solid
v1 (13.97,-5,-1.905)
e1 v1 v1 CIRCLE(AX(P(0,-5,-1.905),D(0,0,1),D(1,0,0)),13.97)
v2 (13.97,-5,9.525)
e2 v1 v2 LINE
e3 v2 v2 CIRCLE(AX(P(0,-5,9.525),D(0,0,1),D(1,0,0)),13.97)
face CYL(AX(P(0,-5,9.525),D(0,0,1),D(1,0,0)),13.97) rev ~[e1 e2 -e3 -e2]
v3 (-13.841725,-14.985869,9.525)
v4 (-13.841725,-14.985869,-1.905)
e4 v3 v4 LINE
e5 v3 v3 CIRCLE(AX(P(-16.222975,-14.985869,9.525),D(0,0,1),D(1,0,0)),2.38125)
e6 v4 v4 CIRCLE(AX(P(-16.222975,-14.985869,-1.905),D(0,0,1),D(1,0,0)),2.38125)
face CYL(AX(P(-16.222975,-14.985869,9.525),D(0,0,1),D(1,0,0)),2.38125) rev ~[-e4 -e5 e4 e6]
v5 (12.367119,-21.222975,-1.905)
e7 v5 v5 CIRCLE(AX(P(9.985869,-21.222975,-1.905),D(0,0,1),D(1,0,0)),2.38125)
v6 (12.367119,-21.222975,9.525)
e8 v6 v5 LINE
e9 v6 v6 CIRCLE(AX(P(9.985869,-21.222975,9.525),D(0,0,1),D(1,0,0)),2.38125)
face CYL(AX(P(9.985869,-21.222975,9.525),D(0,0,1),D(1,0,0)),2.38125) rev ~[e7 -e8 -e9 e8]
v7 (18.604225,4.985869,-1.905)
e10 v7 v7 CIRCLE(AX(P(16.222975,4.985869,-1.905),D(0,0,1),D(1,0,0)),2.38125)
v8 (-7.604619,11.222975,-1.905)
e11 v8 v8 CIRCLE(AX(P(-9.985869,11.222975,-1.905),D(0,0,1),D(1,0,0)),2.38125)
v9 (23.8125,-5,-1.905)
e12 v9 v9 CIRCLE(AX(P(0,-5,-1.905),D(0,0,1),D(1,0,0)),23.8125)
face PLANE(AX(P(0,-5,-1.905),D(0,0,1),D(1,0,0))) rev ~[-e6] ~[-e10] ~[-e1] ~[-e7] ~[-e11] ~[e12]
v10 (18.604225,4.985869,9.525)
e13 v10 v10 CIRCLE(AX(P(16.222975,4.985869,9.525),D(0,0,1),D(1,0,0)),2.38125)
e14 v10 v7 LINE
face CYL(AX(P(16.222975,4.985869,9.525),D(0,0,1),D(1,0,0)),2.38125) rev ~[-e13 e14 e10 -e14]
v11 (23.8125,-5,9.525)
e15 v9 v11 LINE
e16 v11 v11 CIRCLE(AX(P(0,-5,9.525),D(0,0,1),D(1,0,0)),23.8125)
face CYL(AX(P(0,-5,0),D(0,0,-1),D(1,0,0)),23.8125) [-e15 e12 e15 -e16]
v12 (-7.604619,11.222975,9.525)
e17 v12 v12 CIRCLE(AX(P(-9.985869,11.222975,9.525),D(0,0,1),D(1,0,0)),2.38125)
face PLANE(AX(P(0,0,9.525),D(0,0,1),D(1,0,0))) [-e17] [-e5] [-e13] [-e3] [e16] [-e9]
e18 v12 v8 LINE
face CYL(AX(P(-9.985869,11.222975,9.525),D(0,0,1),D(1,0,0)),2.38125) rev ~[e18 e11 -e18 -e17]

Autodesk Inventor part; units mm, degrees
ref_plane "YZ Plane" through (0, 0, 0) normal (1, 0, 0) x (0, 1, 0)
ref_plane "XZ Plane" through (0, 0, 0) normal (0, 1, 0) x (-1, 0, 0)
ref_plane "XY Plane" through (0, 0, 0) normal (0, 0, 1) x (1, 0, 0)
sketch "Sketch1" plane through (0, 0, 0) normal (0, 0, 1) x (1, 0, 0)
  circle A0 centre (0, -5) radius 23.8125
  ellipse E0 centre (-25.066556, -29.009567) end of major axis (-17.396721, -26.490299) minor radius 5.878917 (-26.90757, -23.426346) -> (-26.90757, -23.426346) ccw
  line L0 (-26.90757, -23.426346) -> (-27.832023, -23.737709)
  line L1 (-29.265886, -21.408265) -> (-28.524708, -20.677009)
  ellipse E1 centre (-32.727164, -16.564341) end of major axis (-27.02296, -10.851314) minor radius 5.879236 (-28.571485, -20.72316) -> (-28.525164, -20.676548) ccw
  ellipse E2 centre (-32.346551, -17.58951) end of major axis (-24.296384, -18.197133) minor radius 5.879035 (-31.91081, -11.726643) -> (-31.91081, -11.726643) ccw
  line L2 (-31.91081, -11.726643) -> (-32.884047, -11.660532)
  line L3 (-33.317324, -8.95969) -> (-32.352726, -8.567735)
  ellipse E3 centre (-34.661269, -3.160316) end of major axis (-27.205269, -0.065183) minor radius 5.878801 (-32.413603, -8.592472) -> (-32.35297, -8.567134) ccw
  ellipse E4 centre (-34.70212, -4.252716) end of major axis (-41.906987, -0.610674) minor radius 5.879052 (-32.055919, 0.997131) -> (-32.055919, 0.997131) ccw
  line L4 (-32.055919, 0.997131) -> (-32.929773, 1.430651)
  line L5 (-32.296502, 4.091711) -> (-31.255334, 4.084695)
  ellipse E5 centre (-31.318819, 9.963759) end of major axis (-23.246042, 9.970002) minor radius 5.878619 (-31.321044, 4.085138) -> (-31.25533, 4.085343) ccw
  ellipse E6 centre (-31.774878, 8.970095) end of major axis (-37.03772, 15.092271) minor radius 5.879409 (-27.320805, 12.807895) -> (-27.320805, 12.807895) ccw
  line L6 (-27.320805, 12.807895) -> (-27.96224, 13.542826)
  line L7 (-26.35883, 15.758982) -> (-25.399601, 15.354063)
  ellipse E7 centre (-23.208166, 20.81056) end of major axis (-30.669277, 23.894301) minor radius 5.879328 (-25.46014, 15.379618) -> (-25.399349, 15.35466) ccw
  ellipse E8 centre (-24.009591, 20.066548) end of major axis (-26.528865, 27.736399) minor radius 5.878942 (-18.426346, 21.90757) -> (-18.426346, 21.90757) ccw
  line L8 (-18.426346, 21.90757) -> (-18.737709, 22.832023)
  line L9 (-16.408265, 24.265886) -> (-15.677009, 23.524708)
  ellipse E9 centre (-11.564623, 27.726877) end of major axis (-17.277457, 33.430884) minor radius 5.878834 (-15.72316, 23.571485) -> (-15.676548, 23.525164) ccw
  ellipse E10 centre (-12.589421, 27.346544) end of major axis (-11.981802, 35.39665) minor radius 5.878946 (-6.726643, 26.91081) -> (-6.726643, 26.91081) ccw
  line L10 (-6.726643, 26.91081) -> (-6.660532, 27.884047)
  line L11 (-3.95969, 28.317324) -> (-3.567735, 27.352726)
  ellipse E11 centre (1.839847, 29.661337) end of major axis (-1.255331, 37.11745) minor radius 5.878977 (-3.592472, 27.413603) -> (-3.567134, 27.35297) ccw
  ellipse E12 centre (0.747946, 29.701782) end of major axis (4.389762, 36.906192) minor radius 5.878309 (5.997131, 27.055919) -> (5.997131, 27.055919) ccw
  line L12 (5.997131, 27.055919) -> (6.430651, 27.929773)
  line L13 (9.091711, 27.296502) -> (9.084695, 26.255334)
  ellipse E13 centre (14.963894, 26.318821) end of major axis (14.957652, 34.391691) minor radius 5.878755 (9.085138, 26.321044) -> (9.085343, 26.25533) ccw
  ellipse E14 centre (13.970251, 26.774696) end of major axis (20.092302, 32.03743) minor radius 5.87917 (17.807895, 22.320805) -> (17.807895, 22.320805) ccw
  line L14 (17.807895, 22.320805) -> (18.542826, 22.96224)
  line L15 (20.758982, 21.35883) -> (20.354063, 20.399601)
  ellipse E15 centre (25.810277, 18.208281) end of major axis (28.893936, 25.669199) minor radius 5.879023 (20.379618, 20.46014) -> (20.35466, 20.399349) ccw
  ellipse E16 centre (25.066434, 19.009945) end of major axis (32.736527, 21.529301) minor radius 5.879314 (26.90757, 13.426346) -> (26.90757, 13.426346) ccw
  line L16 (26.90757, 13.426346) -> (27.832023, 13.737709)
  line L17 (29.265886, 11.408265) -> (28.524708, 10.677009)
  ellipse E17 centre (32.727281, 6.564224) end of major axis (38.431566, 12.277331) minor radius 5.879402 (28.571485, 10.72316) -> (28.525164, 10.676548) ccw
  ellipse E18 centre (32.346566, 7.5897) end of major axis (40.396864, 6.982068) minor radius 5.879226 (31.91081, 1.726643) -> (31.91081, 1.726643) ccw
  line L18 (31.91081, 1.726643) -> (32.884047, 1.660532)
  line L19 (33.317324, -1.04031) -> (32.352726, -1.432265)
  ellipse E19 centre (34.661448, -6.840109) end of major axis (42.117742, -3.744858) minor radius 5.879261 (32.413603, -1.407528) -> (32.35297, -1.432866) ccw
  ellipse E20 centre (34.701968, -5.747582) end of major axis (27.497307, -2.105643) minor radius 5.878717 (32.055919, -10.997131) -> (32.055919, -10.997131) ccw
  line L20 (32.055919, -10.997131) -> (32.929773, -11.430651)
  line L21 (32.296502, -14.091711) -> (31.255334, -14.084695)
  ellipse E21 centre (31.318824, -19.964675) end of major axis (39.392231, -19.958437) minor radius 5.879535 (31.321044, -14.085138) -> (31.25533, -14.085343) ccw
  ellipse E22 centre (31.774631, -18.970306) end of major axis (26.511936, -12.848298) minor radius 5.879085 (27.320805, -22.807895) -> (27.320805, -22.807895) ccw
  line L22 (27.320805, -22.807895) -> (27.96224, -23.542826)
  line L23 (26.35883, -25.758982) -> (25.399601, -25.354063)
  ellipse E23 centre (23.208233, -30.810396) end of major axis (15.747234, -27.726703) minor radius 5.879151 (25.46014, -25.379618) -> (25.399349, -25.35466) ccw
  ellipse E24 centre (24.00979, -30.066484) end of major axis (21.49047, -22.396496) minor radius 5.879152 (18.426346, -31.90757) -> (18.426346, -31.90757) ccw
  line L24 (18.426346, -31.90757) -> (18.737709, -32.832023)
  line L25 (16.408265, -34.265886) -> (15.677009, -33.524708)
  ellipse E25 centre (11.564423, -37.72708) end of major axis (5.851452, -32.022934) minor radius 5.879119 (15.72316, -33.571485) -> (15.676548, -33.525164) ccw
  ellipse E26 centre (12.58943, -37.346545) end of major axis (13.19705, -29.296433) minor radius 5.878955 (6.726643, -36.91081) -> (6.726643, -36.91081) ccw
  line L26 (6.726643, -36.91081) -> (6.660532, -37.884047)
  line L27 (3.95969, -38.317324) -> (3.567735, -37.352726)
  ellipse E27 centre (-1.840043, -39.66142) end of major axis (-4.935276, -32.205172) minor radius 5.87919 (3.592472, -37.413603) -> (3.567134, -37.35297) ccw
  ellipse E28 centre (-0.747551, -39.701984) end of major axis (2.8944, -32.497302) minor radius 5.878752 (-5.997131, -37.055919) -> (-5.997131, -37.055919) ccw
  line L28 (-5.997131, -37.055919) -> (-6.430651, -37.929773)
  line L29 (-9.091711, -37.296502) -> (-9.084695, -36.255334)
  ellipse E29 centre (-14.964581, -36.318823) end of major axis (-14.970819, -28.245481) minor radius 5.879441 (-9.085138, -36.321044) -> (-9.085343, -36.25533) ccw
  ellipse E30 centre (-13.970405, -36.774515) end of major axis (-7.848476, -31.511889) minor radius 5.878932 (-17.807895, -32.320805) -> (-17.807895, -32.320805) ccw
  line L30 (-17.807895, -32.320805) -> (-18.542826, -32.96224)
  line L31 (-20.758982, -31.35883) -> (-20.354063, -30.399601)
  ellipse E31 centre (-25.810473, -28.208202) end of major axis (-22.726757, -20.74715) minor radius 5.879234 (-20.379618, -30.46014) -> (-20.35466, -30.399349) ccw
  arc A1 (-20.35466, -30.399349) -> (-19.644418, -27.762867) centre (-30.622228, -26.219462) ccw
  arc A2 (-19.644418, -27.762867) -> (-24.163023, -22.894122) centre (-23.857511, -27.141776) ccw
  arc A3 (-24.163023, -22.894122) -> (-26.845089, -23.405986) centre (-23.441695, -33.956404) ccw
  arc A4 (-28.525164, -20.676548) -> (-26.860048, -18.512554) centre (-36.411586, -12.885608) ccw
  arc A5 (-26.860048, -18.512554) -> (-29.171506, -12.285224) centre (-30.514757, -16.32646) ccw
  arc A6 (-29.171506, -12.285224) -> (-31.845294, -11.731743) centre (-32.738439, -22.781481) ccw
  arc A7 (-32.35297, -8.567134) -> (-29.986479, -7.205076) centre (-36.657611, 1.648759) ccw
  arc A8 (-29.986479, -7.205076) -> (-29.738892, -0.567217) centre (-32.526408, -3.786792) ccw
  arc A9 (-29.738892, -0.567217) -> (-31.997342, 0.967347) centre (-37.051052, -8.899488) ccw
  arc A10 (-31.25533, 4.085343) -> (-28.54774, 4.438104) centre (-31.322846, 15.170913) ccw
  arc A11 (-28.54774, 4.438104) -> (-25.778801, 10.475939) centre (-29.586208, 8.568175) ccw
  arc A12 (-25.778801, 10.475939) -> (-27.278084, 12.757962) centre (-35.722978, 5.576167) ccw
  arc A13 (-25.399349, 15.35466) -> (-22.762867, 14.644418) centre (-21.219462, 25.622228) ccw
  arc A14 (-22.762867, 14.644418) -> (-17.894122, 19.163023) centre (-22.141776, 18.857511) ccw
  arc A15 (-17.894122, 19.163023) -> (-18.405986, 21.845089) centre (-28.956404, 18.441695) ccw
  arc A16 (-15.676548, 23.525164) -> (-13.512554, 21.860048) centre (-7.885608, 31.411586) ccw
  arc A17 (-13.512554, 21.860048) -> (-7.285224, 24.171506) centre (-11.32646, 25.514757) ccw
  arc A18 (-7.285224, 24.171506) -> (-6.731743, 26.845294) centre (-17.781481, 27.738439) ccw
  arc A19 (-3.567134, 27.35297) -> (-2.205076, 24.986479) centre (6.648759, 31.657611) ccw
  arc A20 (-2.205076, 24.986479) -> (4.432783, 24.738892) centre (1.213208, 27.526408) ccw
  arc A21 (4.432783, 24.738892) -> (5.967347, 26.997342) centre (-3.899488, 32.051052) ccw
  arc A22 (9.085343, 26.25533) -> (9.438104, 23.54774) centre (20.170913, 26.322846) ccw
  arc A23 (9.438104, 23.54774) -> (15.475939, 20.778801) centre (13.568175, 24.586208) ccw
  arc A24 (15.475939, 20.778801) -> (17.757962, 22.278084) centre (10.576167, 30.722978) ccw
  arc A25 (20.35466, 20.399349) -> (19.644418, 17.762867) centre (30.622228, 16.219462) ccw
  arc A26 (19.644418, 17.762867) -> (24.163023, 12.894122) centre (23.857511, 17.141776) ccw
  arc A27 (24.163023, 12.894122) -> (26.845089, 13.405986) centre (23.441695, 23.956404) ccw
  arc A28 (28.525164, 10.676548) -> (26.860048, 8.512554) centre (36.411586, 2.885608) ccw
  arc A29 (26.860048, 8.512554) -> (29.171506, 2.285224) centre (30.514757, 6.32646) ccw
  arc A30 (29.171506, 2.285224) -> (31.845294, 1.731743) centre (32.738439, 12.781481) ccw
  arc A31 (32.35297, -1.432866) -> (29.986479, -2.794924) centre (36.657611, -11.648759) ccw
  arc A32 (29.986479, -2.794924) -> (29.738892, -9.432783) centre (32.526408, -6.213208) ccw
  arc A33 (29.738892, -9.432783) -> (31.997342, -10.967347) centre (37.051052, -1.100512) ccw
  arc A34 (31.25533, -14.085343) -> (28.54774, -14.438104) centre (31.322846, -25.170913) ccw
  arc A35 (28.54774, -14.438104) -> (25.778801, -20.475939) centre (29.586208, -18.568175) ccw
  arc A36 (25.778801, -20.475939) -> (27.278084, -22.757962) centre (35.722978, -15.576167) ccw
  arc A37 (25.399349, -25.35466) -> (22.762867, -24.644418) centre (21.219462, -35.622228) ccw
  arc A38 (22.762867, -24.644418) -> (17.894122, -29.163023) centre (22.141776, -28.857511) ccw
  arc A39 (17.894122, -29.163023) -> (18.405986, -31.845089) centre (28.956404, -28.441695) ccw
  arc A40 (15.676548, -33.525164) -> (13.512554, -31.860048) centre (7.885608, -41.411586) ccw
  arc A41 (13.512554, -31.860048) -> (7.285224, -34.171506) centre (11.32646, -35.514757) ccw
  arc A42 (7.285224, -34.171506) -> (6.731743, -36.845294) centre (17.781481, -37.738439) ccw
  arc A43 (3.567134, -37.35297) -> (2.205076, -34.986479) centre (-6.648759, -41.657611) ccw
  arc A44 (2.205076, -34.986479) -> (-4.432783, -34.738892) centre (-1.213208, -37.526408) ccw
  arc A45 (-4.432783, -34.738892) -> (-5.967347, -36.997342) centre (3.899488, -42.051052) ccw
  arc A46 (-9.085343, -36.25533) -> (-9.438104, -33.54774) centre (-20.170913, -36.322846) ccw
  arc A47 (-9.438104, -33.54774) -> (-15.475939, -30.778801) centre (-13.568175, -34.586208) ccw
  arc A48 (-15.475939, -30.778801) -> (-17.757962, -32.278084) centre (-10.576167, -40.722978) ccw
  circle A49 centre (0, -5) radius 13.97
  arc A50 (-30.44477, -24.101609) -> (-27.832023, -23.737709) centre (-30.102742, -16.995817) ccw
  arc A51 (-30.767675, -23.57702) -> (-30.44477, -24.101609) centre (0, -5) ccw
  arc A52 (-29.265886, -21.408265) -> (-30.767675, -23.57702) centre (-24.269527, -26.472419) ccw
  arc A53 (-35.437169, -10.996877) -> (-32.884047, -11.660532) centre (-32.401908, -4.562869) ccw
  arc A54 (-35.534743, -10.388649) -> (-35.437169, -10.996877) centre (0, -5) ccw
  arc A55 (-33.317324, -8.95969) -> (-35.534743, -10.388649) centre (-30.639258, -15.550383) ccw
  arc A56 (-35.034581, 3.020825) -> (-32.929773, 1.430651) centre (-29.768177, 7.803529) ccw
  arc A57 (-34.891968, 3.620095) -> (-35.034581, 3.020825) centre (0, -5) ccw
  arc A58 (-32.296502, 4.091711) -> (-34.891968, 3.620095) centre (-32.34444, -3.022146) ccw
  arc A59 (-29.298295, 15.81743) -> (-27.96224, 13.542826) centre (-22.602511, 18.220707) ccw
  arc A60 (-28.937208, 16.316507) -> (-29.298295, 15.81743) centre (0, -5) ccw
  arc A61 (-26.35883, 15.758982) -> (-28.937208, 16.316507) centre (-29.125474, 9.20498) ccw
  arc A62 (-19.101609, 25.44477) -> (-18.737709, 22.832023) centre (-11.995817, 25.102742) ccw
  arc A63 (-18.57702, 25.767675) -> (-19.101609, 25.44477) centre (0, -5) ccw
  arc A64 (-16.408265, 24.265886) -> (-18.57702, 25.767675) centre (-21.472419, 19.269527) ccw
  arc A65 (-5.996877, 30.437169) -> (-6.660532, 27.884047) centre (0.437131, 27.401908) ccw
  arc A66 (-5.388649, 30.534743) -> (-5.996877, 30.437169) centre (0, -5) ccw
  arc A67 (-3.95969, 28.317324) -> (-5.388649, 30.534743) centre (-10.550383, 25.639258) ccw
  arc A68 (8.020825, 30.034581) -> (6.430651, 27.929773) centre (12.803529, 24.768177) ccw
  arc A69 (8.620095, 29.891968) -> (8.020825, 30.034581) centre (0, -5) ccw
  arc A70 (9.091711, 27.296502) -> (8.620095, 29.891968) centre (1.977854, 27.34444) ccw
  arc A71 (20.81743, 24.298295) -> (18.542826, 22.96224) centre (23.220707, 17.602511) ccw
  arc A72 (21.316507, 23.937208) -> (20.81743, 24.298295) centre (0, -5) ccw
  arc A73 (20.758982, 21.35883) -> (21.316507, 23.937208) centre (14.20498, 24.125474) ccw
  arc A74 (30.44477, 14.101609) -> (27.832023, 13.737709) centre (30.102742, 6.995817) ccw
  arc A75 (30.767675, 13.57702) -> (30.44477, 14.101609) centre (0, -5) ccw
  arc A76 (29.265886, 11.408265) -> (30.767675, 13.57702) centre (24.269527, 16.472419) ccw
  arc A77 (35.437169, 0.996877) -> (32.884047, 1.660532) centre (32.401908, -5.437131) ccw
  arc A78 (35.534743, 0.388649) -> (35.437169, 0.996877) centre (0, -5) ccw
  arc A79 (33.317324, -1.04031) -> (35.534743, 0.388649) centre (30.639258, 5.550383) ccw
  arc A80 (35.034581, -13.020825) -> (32.929773, -11.430651) centre (29.768177, -17.803529) ccw
  arc A81 (34.891968, -13.620095) -> (35.034581, -13.020825) centre (0, -5) ccw
  arc A82 (32.296502, -14.091711) -> (34.891968, -13.620095) centre (32.34444, -6.977854) ccw
  arc A83 (29.298295, -25.81743) -> (27.96224, -23.542826) centre (22.602511, -28.220707) ccw
  arc A84 (28.937208, -26.316507) -> (29.298295, -25.81743) centre (0, -5) ccw
  arc A85 (26.35883, -25.758982) -> (28.937208, -26.316507) centre (29.125474, -19.20498) ccw
  arc A86 (19.101609, -35.44477) -> (18.737709, -32.832023) centre (11.995817, -35.102742) ccw
  arc A87 (18.57702, -35.767675) -> (19.101609, -35.44477) centre (0, -5) ccw
  arc A88 (16.408265, -34.265886) -> (18.57702, -35.767675) centre (21.472419, -29.269527) ccw
  arc A89 (5.996877, -40.437169) -> (6.660532, -37.884047) centre (-0.437131, -37.401908) ccw
  arc A90 (5.388649, -40.534743) -> (5.996877, -40.437169) centre (0, -5) ccw
  arc A91 (3.95969, -38.317324) -> (5.388649, -40.534743) centre (10.550383, -35.639258) ccw
  arc A92 (-8.020825, -40.034581) -> (-6.430651, -37.929773) centre (-12.803529, -34.768177) ccw
  arc A93 (-8.620095, -39.891968) -> (-8.020825, -40.034581) centre (0, -5) ccw
  arc A94 (-9.091711, -37.296502) -> (-8.620095, -39.891968) centre (-1.977854, -37.34444) ccw
  arc A95 (-20.81743, -34.298295) -> (-18.542826, -32.96224) centre (-23.220707, -27.602511) ccw
  arc A96 (-21.316507, -33.937208) -> (-20.81743, -34.298295) centre (0, -5) ccw
  arc A97 (-20.758982, -31.35883) -> (-21.316507, -33.937208) centre (-14.20498, -34.125474) ccw
  circle A98 centre (16.222975, 4.985869) radius 2.38125
  circle A99 centre (9.985869, -21.222975) radius 2.38125
  circle A100 centre (-9.985869, 11.222975) radius 2.38125
  circle A101 centre (-16.222975, -14.985869) radius 2.38125
  point P0 (0, 0)
  dimension "d0" = 47.625
sketch "Sketch1 outline for Extrusion1" plane through (0, 0, 0) normal (0, 0, 1) x (1, 0, 0)
  circle A0 centre (0, -5) radius 23.8125
extrude "Extrusion1" add sketch "Sketch1 outline for Extrusion1" along normal blind 9.525
sketch "Sketch2" plane through (0, -5, 9.525) normal (0, 0, 1) x (1, 0, 0)
  circle A0 centre (0, 0) radius 13.97
  point P0 (0, 5)
  dimension "d3" = 27.94
extrude "Extrusion2" cut sketch "Sketch2" against normal blind 26.9875
sketch "Sketch3" plane through (0, -5, 9.525) normal (0, 0, 1) x (1, 0, 0)
  circle A0 centre (0, 0) radius 13.97 projected
  circle A1 centre (0, 0) radius 23.8125 projected
  point P0 (0, 5)
extrude "Extrusion3" add sketch "Sketch3" against normal blind 11.43
sketch "Sketch4" plane through (0, -5, 9.525) normal (0, 0, 1) x (1, 0, 0)
  circle A0 centre (16.222975, 9.985869) radius 2.38125
  circle A1 centre (9.985869, -16.222975) radius 2.38125
  circle A2 centre (-9.985869, 16.222975) radius 2.38125
  circle A3 centre (-16.222975, -9.985869) radius 2.38125
  circle A4 centre (0, 0) radius 13.97
  arc A5 (32.35297, 3.567134) -> (31.845294, 6.731743) centre (0, 0) ccw
  arc A6 (29.171506, 7.285224) -> (31.845294, 6.731743) centre (32.738439, 17.781481) ccw
  arc A7 (26.860048, 13.512554) -> (29.171506, 7.285224) centre (30.514757, 11.32646) ccw
  arc A8 (28.525164, 15.676548) -> (26.860048, 13.512554) centre (36.411586, 7.885608) ccw
  arc A9 (28.525164, 15.676548) -> (26.845089, 18.405986) centre (0, 0) ccw
  arc A10 (24.163023, 17.894122) -> (26.845089, 18.405986) centre (23.441695, 28.956404) ccw
  arc A11 (19.644418, 22.762867) -> (24.163023, 17.894122) centre (23.857511, 22.141776) ccw
  arc A12 (20.35466, 25.399349) -> (19.644418, 22.762867) centre (30.622228, 21.219462) ccw
  arc A13 (20.35466, 25.399349) -> (17.757962, 27.278084) centre (0, 0) ccw
  arc A14 (15.475939, 25.778801) -> (17.757962, 27.278084) centre (10.576167, 35.722978) ccw
  arc A15 (9.438104, 28.54774) -> (15.475939, 25.778801) centre (13.568175, 29.586208) ccw
  arc A16 (9.085343, 31.25533) -> (9.438104, 28.54774) centre (20.170913, 31.322846) ccw
  arc A17 (9.085343, 31.25533) -> (5.967347, 31.997342) centre (0, 0) ccw
  arc A18 (4.432783, 29.738892) -> (5.967347, 31.997342) centre (-3.899488, 37.051052) ccw
  arc A19 (-2.205076, 29.986479) -> (4.432783, 29.738892) centre (1.213208, 32.526408) ccw
  arc A20 (-3.567134, 32.35297) -> (-2.205076, 29.986479) centre (6.648759, 36.657611) ccw
  arc A21 (-3.567134, 32.35297) -> (-6.731743, 31.845294) centre (0, 0) ccw
  arc A22 (-7.285224, 29.171506) -> (-6.731743, 31.845294) centre (-17.781481, 32.738439) ccw
  arc A23 (-13.512554, 26.860048) -> (-7.285224, 29.171506) centre (-11.32646, 30.514757) ccw
  arc A24 (-15.676548, 28.525164) -> (-13.512554, 26.860048) centre (-7.885608, 36.411586) ccw
  arc A25 (-15.676548, 28.525164) -> (-18.405986, 26.845089) centre (0, 0) ccw
  arc A26 (-17.894122, 24.163023) -> (-18.405986, 26.845089) centre (-28.956404, 23.441695) ccw
  arc A27 (-22.762867, 19.644418) -> (-17.894122, 24.163023) centre (-22.141776, 23.857511) ccw
  arc A28 (-25.399349, 20.35466) -> (-22.762867, 19.644418) centre (-21.219462, 30.622228) ccw
  arc A29 (-25.399349, 20.35466) -> (-27.278084, 17.757962) centre (0, 0) ccw
  arc A30 (-25.778801, 15.475939) -> (-27.278084, 17.757962) centre (-35.722978, 10.576167) ccw
  arc A31 (-28.54774, 9.438104) -> (-25.778801, 15.475939) centre (-29.586208, 13.568175) ccw
  arc A32 (-31.25533, 9.085343) -> (-28.54774, 9.438104) centre (-31.322846, 20.170913) ccw
  arc A33 (-31.25533, 9.085343) -> (-31.997342, 5.967347) centre (0, 0) ccw
  arc A34 (-29.738892, 4.432783) -> (-31.997342, 5.967347) centre (-37.051052, -3.899488) ccw
  arc A35 (-29.986479, -2.205076) -> (-29.738892, 4.432783) centre (-32.526408, 1.213208) ccw
  arc A36 (-32.35297, -3.567134) -> (-29.986479, -2.205076) centre (-36.657611, 6.648759) ccw
  arc A37 (-32.35297, -3.567134) -> (-31.845294, -6.731743) centre (0, 0) ccw
  arc A38 (-29.171506, -7.285224) -> (-31.845294, -6.731743) centre (-32.738439, -17.781481) ccw
  arc A39 (-26.860048, -13.512554) -> (-29.171506, -7.285224) centre (-30.514757, -11.32646) ccw
  arc A40 (-28.525164, -15.676548) -> (-26.860048, -13.512554) centre (-36.411586, -7.885608) ccw
  arc A41 (-28.525164, -15.676548) -> (-26.845089, -18.405986) centre (0, 0) ccw
  arc A42 (-24.163023, -17.894122) -> (-26.845089, -18.405986) centre (-23.441695, -28.956404) ccw
  arc A43 (-19.644418, -22.762867) -> (-24.163023, -17.894122) centre (-23.857511, -22.141776) ccw
  arc A44 (-20.35466, -25.399349) -> (-19.644418, -22.762867) centre (-30.622228, -21.219462) ccw
  arc A45 (-20.35466, -25.399349) -> (-17.757962, -27.278084) centre (0, 0) ccw
  arc A46 (-15.475939, -25.778801) -> (-17.757962, -27.278084) centre (-10.576167, -35.722978) ccw
  arc A47 (-9.438104, -28.54774) -> (-15.475939, -25.778801) centre (-13.568175, -29.586208) ccw
  arc A48 (-9.085343, -31.25533) -> (-9.438104, -28.54774) centre (-20.170913, -31.322846) ccw
  arc A49 (-9.085343, -31.25533) -> (-5.967347, -31.997342) centre (0, 0) ccw
  arc A50 (-4.432783, -29.738892) -> (-5.967347, -31.997342) centre (3.899488, -37.051052) ccw
  arc A51 (2.205076, -29.986479) -> (-4.432783, -29.738892) centre (-1.213208, -32.526408) ccw
  arc A52 (3.567134, -32.35297) -> (2.205076, -29.986479) centre (-6.648759, -36.657611) ccw
  arc A53 (3.567134, -32.35297) -> (6.731743, -31.845294) centre (0, 0) ccw
  arc A54 (7.285224, -29.171506) -> (6.731743, -31.845294) centre (17.781481, -32.738439) ccw
  arc A55 (13.512554, -26.860048) -> (7.285224, -29.171506) centre (11.32646, -30.514757) ccw
  arc A56 (15.676548, -28.525164) -> (13.512554, -26.860048) centre (7.885608, -36.411586) ccw
  arc A57 (15.676548, -28.525164) -> (18.405986, -26.845089) centre (0, 0) ccw
  arc A58 (17.894122, -24.163023) -> (18.405986, -26.845089) centre (28.956404, -23.441695) ccw
  arc A59 (22.762867, -19.644418) -> (17.894122, -24.163023) centre (22.141776, -23.857511) ccw
  arc A60 (25.399349, -20.35466) -> (22.762867, -19.644418) centre (21.219462, -30.622228) ccw
  arc A61 (25.399349, -20.35466) -> (27.278084, -17.757962) centre (0, 0) ccw
  arc A62 (25.778801, -15.475939) -> (27.278084, -17.757962) centre (35.722978, -10.576167) ccw
  arc A63 (28.54774, -9.438104) -> (25.778801, -15.475939) centre (29.586208, -13.568175) ccw
  arc A64 (31.25533, -9.085343) -> (28.54774, -9.438104) centre (31.322846, -20.170913) ccw
  arc A65 (31.25533, -9.085343) -> (31.997342, -5.967347) centre (0, 0) ccw
  arc A66 (29.738892, -4.432783) -> (31.997342, -5.967347) centre (37.051052, 3.899488) ccw
  arc A67 (29.986479, 2.205076) -> (29.738892, -4.432783) centre (32.526408, -1.213208) ccw
  arc A68 (32.35297, 3.567134) -> (29.986479, 2.205076) centre (36.657611, -6.648759) ccw
  point P0 (0, 5)
extrude "Extrusion4" cut sketch "Sketch4" against normal blind 11.43 contours A0 | A1 | A2 | A3
thread "Thread1" size "10-24 UNC" class "2B" standard "ANSI Unified Screw Threads" full length
thread "Thread2" size "10-24 UNC" class "2B" standard "ANSI Unified Screw Threads" full length
thread "Thread3" size "10-24 UNC" class "2B" standard "ANSI Unified Screw Threads" full length
thread "Thread4" size "10-24 UNC" class "2B" standard "ANSI Unified Screw Threads" full length
